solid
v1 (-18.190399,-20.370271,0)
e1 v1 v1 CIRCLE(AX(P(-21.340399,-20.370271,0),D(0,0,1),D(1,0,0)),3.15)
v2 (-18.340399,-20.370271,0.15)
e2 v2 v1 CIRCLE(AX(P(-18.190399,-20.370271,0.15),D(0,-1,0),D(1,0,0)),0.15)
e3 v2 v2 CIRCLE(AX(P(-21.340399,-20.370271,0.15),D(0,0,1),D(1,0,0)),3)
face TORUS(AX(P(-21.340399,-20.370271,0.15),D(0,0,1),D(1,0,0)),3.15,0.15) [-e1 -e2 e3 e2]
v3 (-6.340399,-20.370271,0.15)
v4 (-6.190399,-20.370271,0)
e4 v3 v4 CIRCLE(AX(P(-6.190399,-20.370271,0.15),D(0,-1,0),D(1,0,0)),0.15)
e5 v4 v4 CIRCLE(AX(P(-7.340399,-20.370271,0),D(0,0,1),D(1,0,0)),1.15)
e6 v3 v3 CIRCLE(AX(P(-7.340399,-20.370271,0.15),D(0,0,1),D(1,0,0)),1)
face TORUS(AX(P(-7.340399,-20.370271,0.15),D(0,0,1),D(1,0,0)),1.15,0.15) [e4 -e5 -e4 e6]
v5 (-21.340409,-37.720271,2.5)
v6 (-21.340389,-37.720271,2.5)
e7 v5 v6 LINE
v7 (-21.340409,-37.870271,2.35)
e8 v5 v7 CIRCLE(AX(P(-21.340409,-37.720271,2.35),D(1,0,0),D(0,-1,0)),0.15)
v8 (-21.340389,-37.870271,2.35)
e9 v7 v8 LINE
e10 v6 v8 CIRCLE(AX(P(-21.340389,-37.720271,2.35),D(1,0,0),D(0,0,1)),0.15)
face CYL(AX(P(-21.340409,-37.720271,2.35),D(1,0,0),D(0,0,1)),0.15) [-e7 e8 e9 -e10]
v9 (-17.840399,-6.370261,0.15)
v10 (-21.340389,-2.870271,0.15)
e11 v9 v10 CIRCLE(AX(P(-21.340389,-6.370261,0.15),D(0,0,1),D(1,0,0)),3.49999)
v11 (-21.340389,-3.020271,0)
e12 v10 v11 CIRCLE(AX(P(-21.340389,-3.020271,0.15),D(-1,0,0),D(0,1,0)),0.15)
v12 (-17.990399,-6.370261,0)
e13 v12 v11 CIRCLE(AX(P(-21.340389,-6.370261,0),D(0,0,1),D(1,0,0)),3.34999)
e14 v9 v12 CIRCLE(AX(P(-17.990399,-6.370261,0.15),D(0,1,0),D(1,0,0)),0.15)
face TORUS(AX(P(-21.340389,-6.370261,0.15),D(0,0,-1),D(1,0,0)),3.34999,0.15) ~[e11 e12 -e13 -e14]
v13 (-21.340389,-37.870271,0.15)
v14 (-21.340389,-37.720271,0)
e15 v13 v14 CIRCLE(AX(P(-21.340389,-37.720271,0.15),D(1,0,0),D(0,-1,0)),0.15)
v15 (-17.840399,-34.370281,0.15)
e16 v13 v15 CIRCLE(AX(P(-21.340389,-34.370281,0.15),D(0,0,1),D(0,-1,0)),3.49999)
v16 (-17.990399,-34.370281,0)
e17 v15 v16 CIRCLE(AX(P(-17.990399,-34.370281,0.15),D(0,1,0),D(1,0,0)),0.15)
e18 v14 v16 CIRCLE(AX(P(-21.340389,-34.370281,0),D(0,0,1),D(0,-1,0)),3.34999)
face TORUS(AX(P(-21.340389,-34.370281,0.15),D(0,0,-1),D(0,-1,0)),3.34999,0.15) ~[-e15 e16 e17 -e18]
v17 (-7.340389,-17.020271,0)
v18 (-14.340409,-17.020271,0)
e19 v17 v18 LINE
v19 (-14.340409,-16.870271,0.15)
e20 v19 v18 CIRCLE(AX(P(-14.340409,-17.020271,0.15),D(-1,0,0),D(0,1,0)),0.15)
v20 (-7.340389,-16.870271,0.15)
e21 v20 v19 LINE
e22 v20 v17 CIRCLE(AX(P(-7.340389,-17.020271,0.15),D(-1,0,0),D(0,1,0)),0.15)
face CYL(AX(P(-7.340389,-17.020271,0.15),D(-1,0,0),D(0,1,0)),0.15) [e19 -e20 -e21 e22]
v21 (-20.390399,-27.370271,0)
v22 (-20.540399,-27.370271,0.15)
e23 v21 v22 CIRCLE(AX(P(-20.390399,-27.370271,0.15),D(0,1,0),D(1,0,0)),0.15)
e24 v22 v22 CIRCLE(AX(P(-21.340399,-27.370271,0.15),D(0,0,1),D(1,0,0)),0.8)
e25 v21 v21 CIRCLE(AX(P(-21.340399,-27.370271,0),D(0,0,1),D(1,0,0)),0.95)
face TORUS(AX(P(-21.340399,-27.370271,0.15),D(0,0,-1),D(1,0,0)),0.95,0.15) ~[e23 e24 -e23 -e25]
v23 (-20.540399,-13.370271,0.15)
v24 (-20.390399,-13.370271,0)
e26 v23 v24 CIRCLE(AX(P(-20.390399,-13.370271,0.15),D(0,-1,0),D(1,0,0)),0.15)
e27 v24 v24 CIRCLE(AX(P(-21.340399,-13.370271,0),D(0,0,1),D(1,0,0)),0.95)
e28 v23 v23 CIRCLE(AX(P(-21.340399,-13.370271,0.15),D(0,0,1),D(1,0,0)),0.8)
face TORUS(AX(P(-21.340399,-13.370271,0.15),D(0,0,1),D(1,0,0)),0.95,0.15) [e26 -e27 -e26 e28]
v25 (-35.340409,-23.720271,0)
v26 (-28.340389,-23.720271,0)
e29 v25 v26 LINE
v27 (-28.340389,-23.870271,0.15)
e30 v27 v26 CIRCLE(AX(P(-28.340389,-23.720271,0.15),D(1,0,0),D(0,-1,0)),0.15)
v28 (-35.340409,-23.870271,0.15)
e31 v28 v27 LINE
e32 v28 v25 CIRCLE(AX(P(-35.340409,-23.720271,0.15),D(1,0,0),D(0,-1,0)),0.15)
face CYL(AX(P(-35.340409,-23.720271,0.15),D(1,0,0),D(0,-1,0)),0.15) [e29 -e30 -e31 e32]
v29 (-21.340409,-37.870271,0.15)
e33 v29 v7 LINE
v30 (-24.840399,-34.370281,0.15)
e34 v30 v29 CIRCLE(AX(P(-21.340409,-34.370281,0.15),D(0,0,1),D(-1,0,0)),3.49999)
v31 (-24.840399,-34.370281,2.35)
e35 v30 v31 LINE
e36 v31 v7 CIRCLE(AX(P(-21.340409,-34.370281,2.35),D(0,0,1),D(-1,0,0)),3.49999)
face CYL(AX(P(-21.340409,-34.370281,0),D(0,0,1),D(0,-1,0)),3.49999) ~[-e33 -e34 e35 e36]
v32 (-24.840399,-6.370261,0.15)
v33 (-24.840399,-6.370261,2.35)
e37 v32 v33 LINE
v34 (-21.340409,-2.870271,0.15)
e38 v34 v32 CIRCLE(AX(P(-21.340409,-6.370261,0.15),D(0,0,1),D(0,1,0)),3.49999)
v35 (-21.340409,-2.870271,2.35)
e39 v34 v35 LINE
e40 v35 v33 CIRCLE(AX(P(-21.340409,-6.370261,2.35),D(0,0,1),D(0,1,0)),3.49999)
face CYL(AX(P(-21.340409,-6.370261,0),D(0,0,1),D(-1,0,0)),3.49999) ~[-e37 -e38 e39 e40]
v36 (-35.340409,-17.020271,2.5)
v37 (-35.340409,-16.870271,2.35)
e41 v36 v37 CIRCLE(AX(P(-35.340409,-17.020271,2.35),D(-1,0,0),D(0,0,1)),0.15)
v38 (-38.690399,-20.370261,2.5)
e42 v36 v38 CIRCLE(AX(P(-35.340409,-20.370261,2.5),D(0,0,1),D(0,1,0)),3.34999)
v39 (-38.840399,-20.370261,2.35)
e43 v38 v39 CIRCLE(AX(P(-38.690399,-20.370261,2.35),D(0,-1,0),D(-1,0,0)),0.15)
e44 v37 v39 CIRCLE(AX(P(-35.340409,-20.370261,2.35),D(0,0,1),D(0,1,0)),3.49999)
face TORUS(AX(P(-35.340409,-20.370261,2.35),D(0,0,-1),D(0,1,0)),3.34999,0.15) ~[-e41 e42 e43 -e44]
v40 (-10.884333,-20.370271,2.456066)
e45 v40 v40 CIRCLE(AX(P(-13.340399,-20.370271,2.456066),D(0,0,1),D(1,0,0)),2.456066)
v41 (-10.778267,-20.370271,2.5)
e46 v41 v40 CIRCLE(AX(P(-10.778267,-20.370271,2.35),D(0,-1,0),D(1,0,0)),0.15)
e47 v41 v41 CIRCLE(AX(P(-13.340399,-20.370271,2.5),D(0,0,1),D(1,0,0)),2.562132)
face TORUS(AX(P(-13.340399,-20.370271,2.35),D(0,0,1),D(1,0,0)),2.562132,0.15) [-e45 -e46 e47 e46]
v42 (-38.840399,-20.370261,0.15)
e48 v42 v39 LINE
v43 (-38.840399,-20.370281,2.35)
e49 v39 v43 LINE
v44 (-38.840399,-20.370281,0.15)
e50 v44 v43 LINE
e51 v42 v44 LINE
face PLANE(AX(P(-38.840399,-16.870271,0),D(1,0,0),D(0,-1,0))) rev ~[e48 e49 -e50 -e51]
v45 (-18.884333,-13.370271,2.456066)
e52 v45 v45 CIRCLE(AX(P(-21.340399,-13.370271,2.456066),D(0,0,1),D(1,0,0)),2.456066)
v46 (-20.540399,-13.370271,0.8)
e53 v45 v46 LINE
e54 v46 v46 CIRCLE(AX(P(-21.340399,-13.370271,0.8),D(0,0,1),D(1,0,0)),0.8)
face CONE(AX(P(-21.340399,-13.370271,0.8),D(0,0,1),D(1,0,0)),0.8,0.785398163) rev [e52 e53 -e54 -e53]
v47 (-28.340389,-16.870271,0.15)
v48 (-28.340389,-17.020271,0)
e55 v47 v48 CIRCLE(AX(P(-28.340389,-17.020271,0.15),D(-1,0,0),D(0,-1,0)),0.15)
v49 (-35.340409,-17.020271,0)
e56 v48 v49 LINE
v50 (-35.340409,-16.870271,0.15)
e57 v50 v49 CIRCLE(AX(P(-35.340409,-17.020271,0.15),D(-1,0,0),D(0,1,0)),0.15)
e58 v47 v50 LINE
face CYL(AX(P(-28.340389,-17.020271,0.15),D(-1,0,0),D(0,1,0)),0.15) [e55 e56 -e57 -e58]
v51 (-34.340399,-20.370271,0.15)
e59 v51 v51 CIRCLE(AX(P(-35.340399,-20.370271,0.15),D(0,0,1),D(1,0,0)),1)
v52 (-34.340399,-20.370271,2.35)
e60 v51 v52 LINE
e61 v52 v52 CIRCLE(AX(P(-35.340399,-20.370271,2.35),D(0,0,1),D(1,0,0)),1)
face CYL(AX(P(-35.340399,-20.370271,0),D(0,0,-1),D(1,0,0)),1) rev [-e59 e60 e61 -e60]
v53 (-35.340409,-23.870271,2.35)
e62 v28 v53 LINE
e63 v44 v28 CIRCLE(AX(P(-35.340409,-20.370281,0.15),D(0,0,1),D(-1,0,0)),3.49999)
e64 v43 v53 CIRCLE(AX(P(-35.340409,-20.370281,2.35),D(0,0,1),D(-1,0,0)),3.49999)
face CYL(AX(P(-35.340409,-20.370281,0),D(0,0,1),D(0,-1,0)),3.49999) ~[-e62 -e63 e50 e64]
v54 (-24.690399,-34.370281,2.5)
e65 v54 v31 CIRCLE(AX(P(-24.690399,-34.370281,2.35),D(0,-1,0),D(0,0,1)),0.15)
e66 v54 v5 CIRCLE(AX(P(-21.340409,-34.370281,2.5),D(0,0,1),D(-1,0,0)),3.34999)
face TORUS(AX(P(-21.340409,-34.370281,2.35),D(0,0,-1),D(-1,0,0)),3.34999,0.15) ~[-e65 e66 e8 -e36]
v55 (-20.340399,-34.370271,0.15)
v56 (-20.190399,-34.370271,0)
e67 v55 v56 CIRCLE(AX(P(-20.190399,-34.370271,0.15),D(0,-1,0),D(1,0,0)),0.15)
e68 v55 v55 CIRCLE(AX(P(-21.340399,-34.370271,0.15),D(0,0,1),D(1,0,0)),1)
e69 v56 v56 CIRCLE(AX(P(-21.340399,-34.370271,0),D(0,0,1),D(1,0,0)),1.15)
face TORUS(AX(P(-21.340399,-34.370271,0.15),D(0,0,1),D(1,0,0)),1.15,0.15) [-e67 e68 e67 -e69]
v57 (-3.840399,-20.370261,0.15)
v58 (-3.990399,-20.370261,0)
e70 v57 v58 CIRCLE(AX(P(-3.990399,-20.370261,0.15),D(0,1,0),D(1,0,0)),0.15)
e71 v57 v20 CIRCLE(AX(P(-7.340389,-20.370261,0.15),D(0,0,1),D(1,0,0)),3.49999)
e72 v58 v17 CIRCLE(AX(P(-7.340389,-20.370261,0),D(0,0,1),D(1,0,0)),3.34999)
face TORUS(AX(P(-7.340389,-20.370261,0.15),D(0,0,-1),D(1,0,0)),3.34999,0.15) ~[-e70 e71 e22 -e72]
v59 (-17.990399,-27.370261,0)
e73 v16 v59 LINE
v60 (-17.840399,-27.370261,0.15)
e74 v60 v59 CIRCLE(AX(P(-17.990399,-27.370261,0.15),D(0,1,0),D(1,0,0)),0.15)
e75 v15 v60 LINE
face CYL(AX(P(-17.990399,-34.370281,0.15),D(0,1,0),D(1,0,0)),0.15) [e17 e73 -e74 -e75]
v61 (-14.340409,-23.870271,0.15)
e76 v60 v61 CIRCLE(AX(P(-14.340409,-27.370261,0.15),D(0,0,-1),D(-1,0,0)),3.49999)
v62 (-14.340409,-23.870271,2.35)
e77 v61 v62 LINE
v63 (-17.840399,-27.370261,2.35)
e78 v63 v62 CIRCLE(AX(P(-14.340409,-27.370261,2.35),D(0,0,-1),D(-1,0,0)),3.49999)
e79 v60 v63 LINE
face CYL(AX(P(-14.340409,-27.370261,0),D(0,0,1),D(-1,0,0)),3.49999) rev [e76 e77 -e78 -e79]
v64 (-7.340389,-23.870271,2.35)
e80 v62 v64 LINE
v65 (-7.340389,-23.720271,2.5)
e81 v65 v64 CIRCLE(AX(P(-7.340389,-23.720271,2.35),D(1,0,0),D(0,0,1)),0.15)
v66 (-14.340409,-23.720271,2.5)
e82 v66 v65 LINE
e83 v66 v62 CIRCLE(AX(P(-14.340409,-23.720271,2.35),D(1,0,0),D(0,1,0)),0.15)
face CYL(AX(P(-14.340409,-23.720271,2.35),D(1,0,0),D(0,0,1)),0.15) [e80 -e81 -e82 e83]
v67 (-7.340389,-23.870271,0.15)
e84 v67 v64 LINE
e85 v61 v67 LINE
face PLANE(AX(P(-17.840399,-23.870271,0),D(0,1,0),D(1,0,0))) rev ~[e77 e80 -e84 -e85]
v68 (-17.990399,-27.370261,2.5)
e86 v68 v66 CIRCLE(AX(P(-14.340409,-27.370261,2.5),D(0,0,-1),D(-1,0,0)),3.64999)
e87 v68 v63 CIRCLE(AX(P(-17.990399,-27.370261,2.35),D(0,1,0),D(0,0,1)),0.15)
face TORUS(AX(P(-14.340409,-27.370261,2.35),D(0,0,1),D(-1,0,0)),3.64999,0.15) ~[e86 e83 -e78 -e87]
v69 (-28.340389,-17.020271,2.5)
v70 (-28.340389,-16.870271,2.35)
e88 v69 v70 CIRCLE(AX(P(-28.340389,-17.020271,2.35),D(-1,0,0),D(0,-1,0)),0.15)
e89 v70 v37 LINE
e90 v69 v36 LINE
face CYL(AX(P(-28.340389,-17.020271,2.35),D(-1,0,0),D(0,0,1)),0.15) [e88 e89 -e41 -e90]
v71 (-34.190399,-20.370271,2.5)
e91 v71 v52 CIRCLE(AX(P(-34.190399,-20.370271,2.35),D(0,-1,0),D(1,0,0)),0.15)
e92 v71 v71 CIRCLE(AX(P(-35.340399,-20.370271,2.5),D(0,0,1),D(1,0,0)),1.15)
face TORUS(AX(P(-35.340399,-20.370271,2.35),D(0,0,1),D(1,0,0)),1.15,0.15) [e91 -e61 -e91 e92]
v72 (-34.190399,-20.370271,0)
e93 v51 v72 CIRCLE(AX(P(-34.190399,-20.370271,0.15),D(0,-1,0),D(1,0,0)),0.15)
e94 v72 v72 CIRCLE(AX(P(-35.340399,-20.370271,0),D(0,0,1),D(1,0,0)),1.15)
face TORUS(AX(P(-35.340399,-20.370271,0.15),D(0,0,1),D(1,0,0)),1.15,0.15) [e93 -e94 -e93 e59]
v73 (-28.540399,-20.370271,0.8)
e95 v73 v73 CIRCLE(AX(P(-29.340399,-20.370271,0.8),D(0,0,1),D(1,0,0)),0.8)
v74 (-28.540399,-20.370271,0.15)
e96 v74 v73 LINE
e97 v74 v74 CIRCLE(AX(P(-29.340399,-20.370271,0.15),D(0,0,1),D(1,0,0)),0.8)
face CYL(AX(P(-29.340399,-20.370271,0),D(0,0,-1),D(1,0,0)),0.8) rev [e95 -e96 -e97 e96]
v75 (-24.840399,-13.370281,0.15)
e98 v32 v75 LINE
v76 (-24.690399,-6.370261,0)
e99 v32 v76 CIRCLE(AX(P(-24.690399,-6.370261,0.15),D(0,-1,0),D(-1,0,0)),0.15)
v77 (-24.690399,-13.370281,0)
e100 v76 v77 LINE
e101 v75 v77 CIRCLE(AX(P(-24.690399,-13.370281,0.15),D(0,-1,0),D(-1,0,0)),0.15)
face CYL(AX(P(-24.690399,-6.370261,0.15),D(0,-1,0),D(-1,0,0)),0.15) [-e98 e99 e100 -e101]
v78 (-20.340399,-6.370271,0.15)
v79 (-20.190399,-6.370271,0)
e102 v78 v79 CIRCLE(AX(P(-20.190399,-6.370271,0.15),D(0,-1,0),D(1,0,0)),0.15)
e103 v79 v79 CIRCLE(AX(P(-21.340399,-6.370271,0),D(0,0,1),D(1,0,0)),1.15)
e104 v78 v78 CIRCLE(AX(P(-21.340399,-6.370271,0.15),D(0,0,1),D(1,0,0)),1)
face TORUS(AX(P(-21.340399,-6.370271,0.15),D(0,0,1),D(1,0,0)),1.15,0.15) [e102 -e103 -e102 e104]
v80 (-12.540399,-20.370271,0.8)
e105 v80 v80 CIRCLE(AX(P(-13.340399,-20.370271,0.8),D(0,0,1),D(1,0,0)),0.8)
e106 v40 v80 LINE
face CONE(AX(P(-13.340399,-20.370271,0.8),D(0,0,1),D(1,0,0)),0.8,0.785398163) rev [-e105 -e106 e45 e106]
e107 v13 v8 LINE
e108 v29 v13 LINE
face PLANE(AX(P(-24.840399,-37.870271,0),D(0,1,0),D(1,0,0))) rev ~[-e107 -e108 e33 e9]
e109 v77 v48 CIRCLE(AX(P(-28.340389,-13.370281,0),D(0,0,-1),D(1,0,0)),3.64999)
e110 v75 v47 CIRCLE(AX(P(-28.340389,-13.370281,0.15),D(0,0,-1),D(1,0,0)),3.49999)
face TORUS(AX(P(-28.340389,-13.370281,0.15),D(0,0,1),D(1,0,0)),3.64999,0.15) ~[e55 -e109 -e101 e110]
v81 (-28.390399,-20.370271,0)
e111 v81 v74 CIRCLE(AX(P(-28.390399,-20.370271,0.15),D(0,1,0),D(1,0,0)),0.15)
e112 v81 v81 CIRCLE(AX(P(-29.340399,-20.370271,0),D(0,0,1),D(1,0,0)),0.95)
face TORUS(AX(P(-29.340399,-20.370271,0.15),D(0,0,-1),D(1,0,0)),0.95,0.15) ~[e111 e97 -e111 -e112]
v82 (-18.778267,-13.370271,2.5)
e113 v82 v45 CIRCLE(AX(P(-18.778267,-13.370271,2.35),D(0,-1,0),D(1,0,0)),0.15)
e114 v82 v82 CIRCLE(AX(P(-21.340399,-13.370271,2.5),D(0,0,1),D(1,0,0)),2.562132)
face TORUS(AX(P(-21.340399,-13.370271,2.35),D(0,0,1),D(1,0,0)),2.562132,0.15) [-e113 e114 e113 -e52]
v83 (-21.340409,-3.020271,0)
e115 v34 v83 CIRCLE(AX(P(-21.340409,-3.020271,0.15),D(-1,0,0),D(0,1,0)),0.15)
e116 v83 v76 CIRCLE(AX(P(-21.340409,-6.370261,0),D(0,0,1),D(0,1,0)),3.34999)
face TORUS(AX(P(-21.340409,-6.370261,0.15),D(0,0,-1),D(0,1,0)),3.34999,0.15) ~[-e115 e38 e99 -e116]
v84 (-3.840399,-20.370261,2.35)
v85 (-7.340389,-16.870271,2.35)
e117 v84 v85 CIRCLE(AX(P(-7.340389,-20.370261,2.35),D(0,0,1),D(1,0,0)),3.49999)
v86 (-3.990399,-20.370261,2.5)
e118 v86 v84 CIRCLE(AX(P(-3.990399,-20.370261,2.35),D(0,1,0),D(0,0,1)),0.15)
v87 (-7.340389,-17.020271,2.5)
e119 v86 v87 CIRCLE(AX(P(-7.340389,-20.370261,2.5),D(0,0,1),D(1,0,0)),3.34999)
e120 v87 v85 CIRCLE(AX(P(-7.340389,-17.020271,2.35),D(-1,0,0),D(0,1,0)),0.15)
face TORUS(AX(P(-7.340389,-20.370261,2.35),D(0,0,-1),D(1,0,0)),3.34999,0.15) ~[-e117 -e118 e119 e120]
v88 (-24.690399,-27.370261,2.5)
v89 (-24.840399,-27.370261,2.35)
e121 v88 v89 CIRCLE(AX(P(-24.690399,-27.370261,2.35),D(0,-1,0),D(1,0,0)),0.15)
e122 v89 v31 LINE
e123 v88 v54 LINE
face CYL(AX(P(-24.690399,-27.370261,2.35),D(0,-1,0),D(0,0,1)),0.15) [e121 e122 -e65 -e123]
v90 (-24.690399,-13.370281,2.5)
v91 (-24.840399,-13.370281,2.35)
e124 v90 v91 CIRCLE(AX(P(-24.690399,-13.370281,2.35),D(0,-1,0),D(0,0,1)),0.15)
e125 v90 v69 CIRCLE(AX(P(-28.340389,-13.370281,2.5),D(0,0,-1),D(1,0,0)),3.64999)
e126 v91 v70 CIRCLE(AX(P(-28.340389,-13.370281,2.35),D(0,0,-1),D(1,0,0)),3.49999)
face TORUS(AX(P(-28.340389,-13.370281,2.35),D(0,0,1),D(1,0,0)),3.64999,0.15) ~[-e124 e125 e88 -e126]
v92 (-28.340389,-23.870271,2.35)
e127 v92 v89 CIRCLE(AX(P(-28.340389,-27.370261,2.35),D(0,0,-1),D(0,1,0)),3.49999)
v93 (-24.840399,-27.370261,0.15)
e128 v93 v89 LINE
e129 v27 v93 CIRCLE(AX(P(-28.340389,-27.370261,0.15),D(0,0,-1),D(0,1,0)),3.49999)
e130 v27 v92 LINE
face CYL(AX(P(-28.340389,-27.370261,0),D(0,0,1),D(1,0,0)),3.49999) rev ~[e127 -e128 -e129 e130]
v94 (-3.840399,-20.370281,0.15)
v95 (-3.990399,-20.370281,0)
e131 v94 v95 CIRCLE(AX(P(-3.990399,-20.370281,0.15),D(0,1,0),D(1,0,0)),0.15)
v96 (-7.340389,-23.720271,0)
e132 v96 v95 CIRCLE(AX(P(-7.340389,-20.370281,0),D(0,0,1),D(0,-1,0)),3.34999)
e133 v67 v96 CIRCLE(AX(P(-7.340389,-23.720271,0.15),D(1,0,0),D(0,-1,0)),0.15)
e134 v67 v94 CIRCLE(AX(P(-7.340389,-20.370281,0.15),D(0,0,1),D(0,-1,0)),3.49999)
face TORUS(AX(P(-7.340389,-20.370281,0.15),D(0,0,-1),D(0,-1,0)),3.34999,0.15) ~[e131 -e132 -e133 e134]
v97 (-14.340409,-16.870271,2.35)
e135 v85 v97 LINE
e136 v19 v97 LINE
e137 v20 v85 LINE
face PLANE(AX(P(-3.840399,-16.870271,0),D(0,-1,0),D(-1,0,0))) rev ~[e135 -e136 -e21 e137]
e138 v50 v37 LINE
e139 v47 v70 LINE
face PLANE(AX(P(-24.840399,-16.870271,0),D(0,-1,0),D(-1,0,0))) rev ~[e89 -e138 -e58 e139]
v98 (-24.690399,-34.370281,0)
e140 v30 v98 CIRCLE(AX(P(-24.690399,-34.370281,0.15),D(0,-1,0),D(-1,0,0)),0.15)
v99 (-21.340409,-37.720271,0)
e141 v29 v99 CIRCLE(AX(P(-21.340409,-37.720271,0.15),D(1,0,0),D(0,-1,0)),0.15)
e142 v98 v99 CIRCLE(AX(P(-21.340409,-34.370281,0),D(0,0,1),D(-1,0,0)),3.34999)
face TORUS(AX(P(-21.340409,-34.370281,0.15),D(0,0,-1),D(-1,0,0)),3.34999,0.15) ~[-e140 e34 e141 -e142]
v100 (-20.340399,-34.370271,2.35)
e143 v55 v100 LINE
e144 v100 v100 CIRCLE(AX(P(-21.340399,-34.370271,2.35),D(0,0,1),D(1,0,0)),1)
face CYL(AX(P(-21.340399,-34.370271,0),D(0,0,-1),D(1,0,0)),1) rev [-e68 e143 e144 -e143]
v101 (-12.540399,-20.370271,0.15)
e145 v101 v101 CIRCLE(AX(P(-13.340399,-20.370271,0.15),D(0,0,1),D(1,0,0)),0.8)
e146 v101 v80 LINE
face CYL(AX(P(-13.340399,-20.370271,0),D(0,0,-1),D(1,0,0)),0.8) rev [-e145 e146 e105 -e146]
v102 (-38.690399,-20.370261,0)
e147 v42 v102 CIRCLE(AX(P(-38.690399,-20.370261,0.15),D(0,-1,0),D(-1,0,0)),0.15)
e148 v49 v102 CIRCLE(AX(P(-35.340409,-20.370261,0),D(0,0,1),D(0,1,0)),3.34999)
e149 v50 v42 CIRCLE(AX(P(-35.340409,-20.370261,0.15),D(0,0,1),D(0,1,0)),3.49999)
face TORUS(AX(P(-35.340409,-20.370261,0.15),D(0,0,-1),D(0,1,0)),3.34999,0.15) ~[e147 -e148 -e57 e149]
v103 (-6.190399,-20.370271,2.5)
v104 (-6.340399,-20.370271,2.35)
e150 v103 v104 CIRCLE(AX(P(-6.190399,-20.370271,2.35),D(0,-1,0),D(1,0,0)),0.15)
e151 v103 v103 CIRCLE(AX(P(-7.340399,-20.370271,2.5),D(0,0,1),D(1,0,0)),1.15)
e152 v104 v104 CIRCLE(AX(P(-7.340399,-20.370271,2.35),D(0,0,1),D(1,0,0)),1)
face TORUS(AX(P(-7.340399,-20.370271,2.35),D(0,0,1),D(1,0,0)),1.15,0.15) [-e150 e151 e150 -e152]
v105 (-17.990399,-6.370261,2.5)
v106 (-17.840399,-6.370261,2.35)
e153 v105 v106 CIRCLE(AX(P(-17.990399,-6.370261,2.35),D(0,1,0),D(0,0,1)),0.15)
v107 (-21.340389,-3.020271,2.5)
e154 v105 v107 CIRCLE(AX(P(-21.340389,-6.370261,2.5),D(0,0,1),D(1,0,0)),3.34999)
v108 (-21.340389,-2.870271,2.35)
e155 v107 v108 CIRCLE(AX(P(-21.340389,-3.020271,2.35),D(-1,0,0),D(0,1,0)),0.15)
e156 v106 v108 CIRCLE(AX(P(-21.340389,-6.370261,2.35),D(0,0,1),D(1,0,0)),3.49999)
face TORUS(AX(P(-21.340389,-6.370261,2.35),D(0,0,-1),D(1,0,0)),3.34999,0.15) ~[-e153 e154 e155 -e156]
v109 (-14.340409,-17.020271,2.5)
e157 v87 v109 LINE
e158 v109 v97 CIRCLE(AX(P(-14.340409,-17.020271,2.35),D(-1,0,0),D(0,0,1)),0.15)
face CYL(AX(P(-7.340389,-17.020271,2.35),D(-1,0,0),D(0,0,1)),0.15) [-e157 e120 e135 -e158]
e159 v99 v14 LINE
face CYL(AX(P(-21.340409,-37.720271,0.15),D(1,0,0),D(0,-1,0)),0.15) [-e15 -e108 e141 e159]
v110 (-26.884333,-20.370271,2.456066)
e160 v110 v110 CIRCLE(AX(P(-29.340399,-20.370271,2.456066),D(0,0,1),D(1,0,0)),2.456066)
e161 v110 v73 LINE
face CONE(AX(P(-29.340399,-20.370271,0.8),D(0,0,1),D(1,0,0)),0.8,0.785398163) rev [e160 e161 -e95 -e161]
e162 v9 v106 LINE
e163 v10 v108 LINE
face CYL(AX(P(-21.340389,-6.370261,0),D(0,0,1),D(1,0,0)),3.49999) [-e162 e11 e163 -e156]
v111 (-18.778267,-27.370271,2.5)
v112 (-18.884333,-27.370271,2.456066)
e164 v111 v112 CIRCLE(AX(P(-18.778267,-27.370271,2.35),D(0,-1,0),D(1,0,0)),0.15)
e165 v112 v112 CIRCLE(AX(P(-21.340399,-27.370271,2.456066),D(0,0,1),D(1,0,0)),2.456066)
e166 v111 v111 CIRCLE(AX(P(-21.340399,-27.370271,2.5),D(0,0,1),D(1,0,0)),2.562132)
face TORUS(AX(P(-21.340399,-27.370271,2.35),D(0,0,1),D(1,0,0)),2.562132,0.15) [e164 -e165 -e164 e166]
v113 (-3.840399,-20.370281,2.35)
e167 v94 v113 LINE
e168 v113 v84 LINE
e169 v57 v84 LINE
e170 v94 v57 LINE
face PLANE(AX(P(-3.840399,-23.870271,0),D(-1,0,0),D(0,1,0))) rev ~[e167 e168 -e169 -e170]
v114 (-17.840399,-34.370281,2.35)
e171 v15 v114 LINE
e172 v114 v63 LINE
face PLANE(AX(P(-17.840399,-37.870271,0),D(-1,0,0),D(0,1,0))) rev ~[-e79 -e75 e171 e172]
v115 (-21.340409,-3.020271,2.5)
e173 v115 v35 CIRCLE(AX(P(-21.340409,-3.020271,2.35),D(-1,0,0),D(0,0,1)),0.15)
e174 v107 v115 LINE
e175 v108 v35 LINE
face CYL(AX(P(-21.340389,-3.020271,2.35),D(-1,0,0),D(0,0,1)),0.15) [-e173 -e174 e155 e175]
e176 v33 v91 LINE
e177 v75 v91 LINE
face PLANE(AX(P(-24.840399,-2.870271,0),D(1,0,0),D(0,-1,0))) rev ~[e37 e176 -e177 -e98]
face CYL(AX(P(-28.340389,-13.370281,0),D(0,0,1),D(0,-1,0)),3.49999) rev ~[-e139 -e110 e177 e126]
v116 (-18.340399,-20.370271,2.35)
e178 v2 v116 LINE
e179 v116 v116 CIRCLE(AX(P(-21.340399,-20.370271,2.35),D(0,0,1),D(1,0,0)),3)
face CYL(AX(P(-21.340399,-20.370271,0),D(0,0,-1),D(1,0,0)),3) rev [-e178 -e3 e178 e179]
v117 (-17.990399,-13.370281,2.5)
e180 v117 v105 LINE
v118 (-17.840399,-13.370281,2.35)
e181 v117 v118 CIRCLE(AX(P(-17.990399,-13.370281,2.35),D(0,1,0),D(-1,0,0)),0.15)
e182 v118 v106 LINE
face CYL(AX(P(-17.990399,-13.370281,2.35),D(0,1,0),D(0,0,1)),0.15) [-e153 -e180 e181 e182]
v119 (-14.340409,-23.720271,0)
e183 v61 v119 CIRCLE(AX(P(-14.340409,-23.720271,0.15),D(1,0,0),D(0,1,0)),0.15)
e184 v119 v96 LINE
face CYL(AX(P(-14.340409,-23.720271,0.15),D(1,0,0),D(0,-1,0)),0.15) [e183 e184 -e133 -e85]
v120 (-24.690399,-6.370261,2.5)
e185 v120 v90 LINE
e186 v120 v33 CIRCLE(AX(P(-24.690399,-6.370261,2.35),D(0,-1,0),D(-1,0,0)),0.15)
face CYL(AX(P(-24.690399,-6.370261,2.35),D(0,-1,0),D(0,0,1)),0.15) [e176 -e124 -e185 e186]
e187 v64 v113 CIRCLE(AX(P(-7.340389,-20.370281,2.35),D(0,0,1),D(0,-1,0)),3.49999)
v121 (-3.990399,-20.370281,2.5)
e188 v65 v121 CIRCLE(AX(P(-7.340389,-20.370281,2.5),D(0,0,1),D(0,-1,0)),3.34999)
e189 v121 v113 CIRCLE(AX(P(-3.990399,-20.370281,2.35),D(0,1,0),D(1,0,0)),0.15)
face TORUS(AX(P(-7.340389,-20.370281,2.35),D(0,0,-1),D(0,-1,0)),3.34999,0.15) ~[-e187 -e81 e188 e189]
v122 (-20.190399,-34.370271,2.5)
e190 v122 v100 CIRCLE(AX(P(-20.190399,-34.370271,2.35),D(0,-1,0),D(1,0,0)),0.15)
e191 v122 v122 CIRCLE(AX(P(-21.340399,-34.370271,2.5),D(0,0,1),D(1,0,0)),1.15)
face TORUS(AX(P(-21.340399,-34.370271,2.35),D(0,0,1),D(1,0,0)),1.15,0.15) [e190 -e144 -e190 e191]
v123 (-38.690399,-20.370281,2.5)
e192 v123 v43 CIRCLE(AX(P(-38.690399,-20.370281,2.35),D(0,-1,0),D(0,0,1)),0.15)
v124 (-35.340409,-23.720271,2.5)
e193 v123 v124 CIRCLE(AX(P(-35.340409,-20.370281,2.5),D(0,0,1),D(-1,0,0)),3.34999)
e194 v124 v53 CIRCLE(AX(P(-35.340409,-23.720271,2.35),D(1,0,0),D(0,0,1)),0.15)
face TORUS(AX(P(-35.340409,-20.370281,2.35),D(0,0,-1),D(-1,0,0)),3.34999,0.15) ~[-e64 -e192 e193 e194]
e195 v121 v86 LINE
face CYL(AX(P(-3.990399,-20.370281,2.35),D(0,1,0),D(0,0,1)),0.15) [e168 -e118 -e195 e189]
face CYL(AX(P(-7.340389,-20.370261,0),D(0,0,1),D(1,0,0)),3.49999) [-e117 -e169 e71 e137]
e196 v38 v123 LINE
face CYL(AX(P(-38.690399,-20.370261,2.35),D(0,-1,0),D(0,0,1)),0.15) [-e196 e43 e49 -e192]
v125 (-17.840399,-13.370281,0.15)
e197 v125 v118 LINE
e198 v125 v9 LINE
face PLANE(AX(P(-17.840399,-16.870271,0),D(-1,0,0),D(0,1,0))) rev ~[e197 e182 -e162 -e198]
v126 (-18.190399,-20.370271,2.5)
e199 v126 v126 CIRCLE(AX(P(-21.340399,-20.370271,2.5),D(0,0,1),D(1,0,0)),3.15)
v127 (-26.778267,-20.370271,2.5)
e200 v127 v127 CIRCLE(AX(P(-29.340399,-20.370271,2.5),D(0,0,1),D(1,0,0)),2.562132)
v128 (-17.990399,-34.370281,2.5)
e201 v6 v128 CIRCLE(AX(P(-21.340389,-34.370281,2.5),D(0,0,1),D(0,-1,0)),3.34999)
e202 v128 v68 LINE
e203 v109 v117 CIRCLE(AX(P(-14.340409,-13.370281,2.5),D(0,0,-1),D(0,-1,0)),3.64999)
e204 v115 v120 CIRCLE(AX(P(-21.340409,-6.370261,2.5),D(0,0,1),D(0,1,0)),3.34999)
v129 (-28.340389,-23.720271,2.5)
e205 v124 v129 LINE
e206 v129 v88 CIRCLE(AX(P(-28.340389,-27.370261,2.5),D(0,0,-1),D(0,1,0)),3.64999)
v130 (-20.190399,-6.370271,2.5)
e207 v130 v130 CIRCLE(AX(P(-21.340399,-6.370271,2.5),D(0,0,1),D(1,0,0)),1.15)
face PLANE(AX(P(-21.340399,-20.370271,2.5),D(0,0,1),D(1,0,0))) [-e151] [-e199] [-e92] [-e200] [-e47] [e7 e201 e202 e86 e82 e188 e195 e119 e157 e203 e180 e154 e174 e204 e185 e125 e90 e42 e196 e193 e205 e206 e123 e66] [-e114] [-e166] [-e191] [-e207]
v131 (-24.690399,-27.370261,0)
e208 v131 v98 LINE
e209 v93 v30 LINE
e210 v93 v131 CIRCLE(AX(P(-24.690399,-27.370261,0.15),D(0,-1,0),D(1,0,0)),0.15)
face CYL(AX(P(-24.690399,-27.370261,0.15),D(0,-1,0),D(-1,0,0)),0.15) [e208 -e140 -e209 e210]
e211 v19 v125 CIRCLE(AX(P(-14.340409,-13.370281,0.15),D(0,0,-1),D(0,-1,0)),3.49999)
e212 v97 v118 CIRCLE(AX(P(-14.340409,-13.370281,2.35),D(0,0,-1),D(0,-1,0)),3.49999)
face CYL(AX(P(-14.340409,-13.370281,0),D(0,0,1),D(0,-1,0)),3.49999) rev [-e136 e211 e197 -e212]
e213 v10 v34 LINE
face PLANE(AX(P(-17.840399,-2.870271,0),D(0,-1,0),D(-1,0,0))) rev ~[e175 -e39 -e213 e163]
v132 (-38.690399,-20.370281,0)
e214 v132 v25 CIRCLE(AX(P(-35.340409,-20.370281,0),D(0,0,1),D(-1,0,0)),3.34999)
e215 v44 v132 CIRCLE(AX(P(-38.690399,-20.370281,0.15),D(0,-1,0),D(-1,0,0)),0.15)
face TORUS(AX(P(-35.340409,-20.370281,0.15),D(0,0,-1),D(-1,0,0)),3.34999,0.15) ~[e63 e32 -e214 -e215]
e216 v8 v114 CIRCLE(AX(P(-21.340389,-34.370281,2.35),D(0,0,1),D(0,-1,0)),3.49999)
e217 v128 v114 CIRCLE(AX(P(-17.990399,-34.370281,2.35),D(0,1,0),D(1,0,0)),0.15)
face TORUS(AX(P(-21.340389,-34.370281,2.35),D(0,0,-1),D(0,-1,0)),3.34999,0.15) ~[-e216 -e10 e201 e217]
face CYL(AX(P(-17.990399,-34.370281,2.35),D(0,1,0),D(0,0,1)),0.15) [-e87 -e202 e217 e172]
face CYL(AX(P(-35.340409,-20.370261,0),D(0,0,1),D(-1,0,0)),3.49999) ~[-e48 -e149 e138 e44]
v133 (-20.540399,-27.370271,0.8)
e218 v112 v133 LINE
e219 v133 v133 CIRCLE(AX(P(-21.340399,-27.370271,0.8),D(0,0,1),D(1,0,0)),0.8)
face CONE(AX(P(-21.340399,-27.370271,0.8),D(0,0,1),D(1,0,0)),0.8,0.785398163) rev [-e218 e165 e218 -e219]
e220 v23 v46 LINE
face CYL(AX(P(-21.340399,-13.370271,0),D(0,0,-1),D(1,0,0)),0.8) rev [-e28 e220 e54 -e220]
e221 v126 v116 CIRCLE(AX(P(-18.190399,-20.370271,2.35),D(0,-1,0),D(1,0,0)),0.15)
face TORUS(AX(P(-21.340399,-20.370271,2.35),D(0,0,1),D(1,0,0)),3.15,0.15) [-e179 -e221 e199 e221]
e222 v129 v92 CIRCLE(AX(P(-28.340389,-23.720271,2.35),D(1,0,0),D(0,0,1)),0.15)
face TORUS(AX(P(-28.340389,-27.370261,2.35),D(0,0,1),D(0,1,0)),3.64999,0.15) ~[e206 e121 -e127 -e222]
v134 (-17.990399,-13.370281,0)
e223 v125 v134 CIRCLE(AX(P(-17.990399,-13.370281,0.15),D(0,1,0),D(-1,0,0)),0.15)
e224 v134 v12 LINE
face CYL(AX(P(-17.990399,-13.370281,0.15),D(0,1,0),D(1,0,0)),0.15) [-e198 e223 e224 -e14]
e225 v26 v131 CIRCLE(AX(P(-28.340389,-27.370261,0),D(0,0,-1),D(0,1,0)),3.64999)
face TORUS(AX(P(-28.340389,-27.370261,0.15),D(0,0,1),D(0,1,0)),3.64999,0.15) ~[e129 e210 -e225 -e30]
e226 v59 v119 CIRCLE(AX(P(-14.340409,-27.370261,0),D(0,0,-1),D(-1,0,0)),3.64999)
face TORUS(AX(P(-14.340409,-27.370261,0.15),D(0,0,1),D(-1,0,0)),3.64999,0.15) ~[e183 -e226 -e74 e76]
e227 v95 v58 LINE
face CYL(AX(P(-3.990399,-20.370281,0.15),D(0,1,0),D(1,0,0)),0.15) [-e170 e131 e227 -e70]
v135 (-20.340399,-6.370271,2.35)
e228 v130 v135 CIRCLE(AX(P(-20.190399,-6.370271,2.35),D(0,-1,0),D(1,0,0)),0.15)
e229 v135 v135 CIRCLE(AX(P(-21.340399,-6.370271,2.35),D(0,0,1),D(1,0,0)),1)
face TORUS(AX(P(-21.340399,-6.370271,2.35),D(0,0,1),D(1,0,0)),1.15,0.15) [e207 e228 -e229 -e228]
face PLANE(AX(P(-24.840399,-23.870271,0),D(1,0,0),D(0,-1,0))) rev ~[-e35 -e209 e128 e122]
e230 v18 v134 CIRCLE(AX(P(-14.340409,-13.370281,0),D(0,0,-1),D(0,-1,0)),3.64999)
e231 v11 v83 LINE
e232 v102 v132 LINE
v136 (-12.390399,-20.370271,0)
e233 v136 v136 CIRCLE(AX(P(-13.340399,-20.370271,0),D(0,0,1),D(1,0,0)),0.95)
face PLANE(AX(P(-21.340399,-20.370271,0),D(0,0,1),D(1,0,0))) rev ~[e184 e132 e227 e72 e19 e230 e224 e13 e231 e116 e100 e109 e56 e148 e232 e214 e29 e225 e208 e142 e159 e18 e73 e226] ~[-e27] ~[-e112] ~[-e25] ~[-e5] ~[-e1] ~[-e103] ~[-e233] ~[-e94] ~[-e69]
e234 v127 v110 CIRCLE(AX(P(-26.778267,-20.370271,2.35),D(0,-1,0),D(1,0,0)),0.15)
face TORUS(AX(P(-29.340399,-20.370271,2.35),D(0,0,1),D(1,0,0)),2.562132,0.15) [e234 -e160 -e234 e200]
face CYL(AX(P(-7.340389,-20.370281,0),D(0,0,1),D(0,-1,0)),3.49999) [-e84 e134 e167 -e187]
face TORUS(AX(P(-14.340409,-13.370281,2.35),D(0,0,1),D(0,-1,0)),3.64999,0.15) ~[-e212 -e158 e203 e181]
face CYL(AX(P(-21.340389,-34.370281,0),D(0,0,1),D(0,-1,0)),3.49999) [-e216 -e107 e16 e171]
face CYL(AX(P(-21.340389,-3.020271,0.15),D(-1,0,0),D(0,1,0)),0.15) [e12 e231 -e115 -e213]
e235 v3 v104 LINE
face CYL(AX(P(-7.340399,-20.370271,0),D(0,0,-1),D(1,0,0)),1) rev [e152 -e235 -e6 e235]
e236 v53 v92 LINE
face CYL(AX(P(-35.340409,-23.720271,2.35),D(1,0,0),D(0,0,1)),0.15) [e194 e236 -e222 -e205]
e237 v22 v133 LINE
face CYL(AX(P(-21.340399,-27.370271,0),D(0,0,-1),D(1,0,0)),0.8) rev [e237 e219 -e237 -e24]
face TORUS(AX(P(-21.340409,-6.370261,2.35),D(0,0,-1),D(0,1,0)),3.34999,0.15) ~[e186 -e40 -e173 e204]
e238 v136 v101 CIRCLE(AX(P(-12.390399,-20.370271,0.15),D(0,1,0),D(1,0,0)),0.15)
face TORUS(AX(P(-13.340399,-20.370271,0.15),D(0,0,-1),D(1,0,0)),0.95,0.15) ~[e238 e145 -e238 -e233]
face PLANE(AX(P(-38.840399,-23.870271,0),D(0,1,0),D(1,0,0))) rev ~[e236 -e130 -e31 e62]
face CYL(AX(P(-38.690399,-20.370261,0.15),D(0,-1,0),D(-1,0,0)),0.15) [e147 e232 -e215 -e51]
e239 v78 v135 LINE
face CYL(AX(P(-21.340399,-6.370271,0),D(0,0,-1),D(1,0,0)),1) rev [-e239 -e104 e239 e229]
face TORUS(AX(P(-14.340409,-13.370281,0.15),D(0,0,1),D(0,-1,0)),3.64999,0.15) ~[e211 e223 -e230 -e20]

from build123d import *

# Parameters (mm, degrees)
F0_R     = 1
F0_R_2   = 0.8
F0_R_3   = 3
F1_DEPTH = 2.5
F2_R     = 3.49999
F3_SIZE  = 1.7
F4_R     = 0.15


# Not quite as in the source:
# - a fillet or chamfer is up to 0.001 mm smaller than in the source, because OpenCascade refuses the exact size


with BuildPart() as f1:
    # F0 (on Top) → F1 (new body)
    with BuildSketch(Plane.XY):
        Polygon((-24.8403990492, -37.8702705037), (-17.8403990492, -37.8702705037), (-17.8403990492, -23.8702705037), (-3.8403990492, -23.8702705037), (-3.8403990492, -16.8702705037), (-17.8403990492, -16.8702705037), (-17.8403990492, -2.8702705037), (-24.8403990492, -2.8702705037), (-24.8403990492, -16.8702705037), (-38.8403990492, -16.8702705037), (-38.8403990492, -23.8702705037), (-24.8403990492, -23.8702705037), align=None)
        with Locations((-21.3403990492, -34.3702705037)):
            Circle(F0_R, mode=Mode.SUBTRACT)
        with Locations((-21.3403990492, -27.3702705037)):
            Circle(F0_R_2, mode=Mode.SUBTRACT)
        with Locations((-35.3403990492, -20.3702705037)):
            Circle(F0_R, mode=Mode.SUBTRACT)
        with Locations((-29.3403990492, -20.3702705037)):
            Circle(F0_R_2, mode=Mode.SUBTRACT)
        with Locations((-21.3403990492, -13.3702705037)):
            Circle(F0_R_2, mode=Mode.SUBTRACT)
        with Locations((-21.3403990492, -6.3702705037)):
            Circle(F0_R, mode=Mode.SUBTRACT)
        with Locations((-21.3403990492, -20.3702705037)):
            Circle(F0_R_3, mode=Mode.SUBTRACT)
        with Locations((-13.3403990492, -20.3702705037)):
            Circle(F0_R_2, mode=Mode.SUBTRACT)
        with Locations((-7.3403990492, -20.3702705037)):
            Circle(F0_R, mode=Mode.SUBTRACT)
    extrude(amount=F1_DEPTH)

    # F2 (radius 3.5 in the source; OpenCascade refuses exactly that, so slightly less here)
    f2_edges = [f1.edges().sort_by_distance(p)[0] for p in [
        (-24.840399, -2.870271, 1.25),
        (-17.840399, -2.870271, 1.25),
        (-3.840399, -16.870271, 1.25),
        (-3.840399, -23.870271, 1.25),
        (-17.840399, -37.870271, 1.25),
        (-24.840399, -37.870271, 1.25),
        (-38.840399, -23.870271, 1.25),
        (-38.840399, -16.870271, 1.25),
        (-24.840399, -23.870271, 1.25),
        (-17.840399, -23.870271, 1.25),
        (-17.840399, -16.870271, 1.25),
        (-24.840399, -16.870271, 1.25),
    ]]
    fillet(f2_edges, radius=F2_R)

    # F3
    f3_edges = [f1.edges().sort_by_distance(p)[0] for p in [
        (-22.140399, -13.370271, 2.5),
        (-14.140399, -20.370271, 2.5),
        (-22.140399, -27.370271, 2.5),
        (-30.140399, -20.370271, 2.5),
    ]]
    chamfer(f3_edges, length=F3_SIZE)

    # F4
    f4_edges = [f1.edges().sort_by_distance(p)[0] for p in [
        (-23.840399, -13.370271, 2.5),
        (-31.840399, -23.870271, 2.5),
        (-37.815276, -22.845147, 2.5),
        (-25.865522, -24.895394, 2.5),
        (-38.840399, -20.370271, 2.5),
        (-24.840399, -30.870271, 2.5),
        (-37.815276, -17.895394, 2.5),
        (-23.815276, -36.845147, 2.5),
        (-31.840399, -16.870271, 2.5),
        (-21.340399, -37.870271, 2.5),
        (-25.865522, -15.845147, 2.5),
        (-18.865522, -36.845147, 2.5),
        (-24.840399, -9.870271, 2.5),
        (-17.840399, -30.870271, 2.5),
        (-23.815276, -3.895394, 2.5),
        (-16.815276, -24.895394, 2.5),
        (-21.340399, -2.870271, 2.5),
        (-10.840399, -23.870271, 2.5),
        (-18.865522, -3.895394, 2.5),
        (-4.865522, -22.845147, 2.5),
        (-17.840399, -9.870271, 2.5),
        (-3.840399, -20.370271, 2.5),
        (-16.815276, -15.845147, 2.5),
        (-4.865522, -17.895394, 2.5),
        (-10.840399, -16.870271, 2.5),
        (-22.340399, -34.370271, 2.5),
        (-36.340399, -20.370271, 2.5),
        (-22.340399, -6.370271, 2.5),
        (-24.340399, -20.370271, 2.5),
        (-8.340399, -20.370271, 2.5),
        (-15.840399, -20.370271, 2.5),
        (-23.840399, -27.370271, 2.5),
        (-31.840399, -20.370271, 2.5),
        (-31.840399, -23.870271, 0),
        (-37.815276, -22.845147, 0),
        (-25.865522, -24.895394, 0),
        (-38.840399, -20.370271, 0),
        (-24.840399, -30.870271, 0),
        (-37.815276, -17.895394, 0),
        (-23.815276, -36.845147, 0),
        (-31.840399, -16.870271, 0),
        (-21.340399, -37.870271, 0),
        (-25.865522, -15.845147, 0),
        (-18.865522, -36.845147, 0),
        (-24.840399, -9.870271, 0),
        (-17.840399, -30.870271, 0),
        (-23.815276, -3.895394, 0),
        (-16.815276, -24.895394, 0),
        (-21.340399, -2.870271, 0),
        (-10.840399, -23.870271, 0),
        (-18.865522, -3.895394, 0),
        (-4.865522, -22.845147, 0),
        (-17.840399, -9.870271, 0),
        (-3.840399, -20.370271, 0),
        (-16.815276, -15.845147, 0),
        (-4.865522, -17.895394, 0),
        (-10.840399, -16.870271, 0),
        (-22.340399, -34.370271, 0),
        (-22.140399, -27.370271, 0),
        (-36.340399, -20.370271, 0),
        (-30.140399, -20.370271, 0),
        (-22.140399, -13.370271, 0),
        (-22.340399, -6.370271, 0),
        (-24.340399, -20.370271, 0),
        (-14.140399, -20.370271, 0),
        (-8.340399, -20.370271, 0),
    ]]
    fillet(f4_edges, radius=F4_R)


solid = f1.part
